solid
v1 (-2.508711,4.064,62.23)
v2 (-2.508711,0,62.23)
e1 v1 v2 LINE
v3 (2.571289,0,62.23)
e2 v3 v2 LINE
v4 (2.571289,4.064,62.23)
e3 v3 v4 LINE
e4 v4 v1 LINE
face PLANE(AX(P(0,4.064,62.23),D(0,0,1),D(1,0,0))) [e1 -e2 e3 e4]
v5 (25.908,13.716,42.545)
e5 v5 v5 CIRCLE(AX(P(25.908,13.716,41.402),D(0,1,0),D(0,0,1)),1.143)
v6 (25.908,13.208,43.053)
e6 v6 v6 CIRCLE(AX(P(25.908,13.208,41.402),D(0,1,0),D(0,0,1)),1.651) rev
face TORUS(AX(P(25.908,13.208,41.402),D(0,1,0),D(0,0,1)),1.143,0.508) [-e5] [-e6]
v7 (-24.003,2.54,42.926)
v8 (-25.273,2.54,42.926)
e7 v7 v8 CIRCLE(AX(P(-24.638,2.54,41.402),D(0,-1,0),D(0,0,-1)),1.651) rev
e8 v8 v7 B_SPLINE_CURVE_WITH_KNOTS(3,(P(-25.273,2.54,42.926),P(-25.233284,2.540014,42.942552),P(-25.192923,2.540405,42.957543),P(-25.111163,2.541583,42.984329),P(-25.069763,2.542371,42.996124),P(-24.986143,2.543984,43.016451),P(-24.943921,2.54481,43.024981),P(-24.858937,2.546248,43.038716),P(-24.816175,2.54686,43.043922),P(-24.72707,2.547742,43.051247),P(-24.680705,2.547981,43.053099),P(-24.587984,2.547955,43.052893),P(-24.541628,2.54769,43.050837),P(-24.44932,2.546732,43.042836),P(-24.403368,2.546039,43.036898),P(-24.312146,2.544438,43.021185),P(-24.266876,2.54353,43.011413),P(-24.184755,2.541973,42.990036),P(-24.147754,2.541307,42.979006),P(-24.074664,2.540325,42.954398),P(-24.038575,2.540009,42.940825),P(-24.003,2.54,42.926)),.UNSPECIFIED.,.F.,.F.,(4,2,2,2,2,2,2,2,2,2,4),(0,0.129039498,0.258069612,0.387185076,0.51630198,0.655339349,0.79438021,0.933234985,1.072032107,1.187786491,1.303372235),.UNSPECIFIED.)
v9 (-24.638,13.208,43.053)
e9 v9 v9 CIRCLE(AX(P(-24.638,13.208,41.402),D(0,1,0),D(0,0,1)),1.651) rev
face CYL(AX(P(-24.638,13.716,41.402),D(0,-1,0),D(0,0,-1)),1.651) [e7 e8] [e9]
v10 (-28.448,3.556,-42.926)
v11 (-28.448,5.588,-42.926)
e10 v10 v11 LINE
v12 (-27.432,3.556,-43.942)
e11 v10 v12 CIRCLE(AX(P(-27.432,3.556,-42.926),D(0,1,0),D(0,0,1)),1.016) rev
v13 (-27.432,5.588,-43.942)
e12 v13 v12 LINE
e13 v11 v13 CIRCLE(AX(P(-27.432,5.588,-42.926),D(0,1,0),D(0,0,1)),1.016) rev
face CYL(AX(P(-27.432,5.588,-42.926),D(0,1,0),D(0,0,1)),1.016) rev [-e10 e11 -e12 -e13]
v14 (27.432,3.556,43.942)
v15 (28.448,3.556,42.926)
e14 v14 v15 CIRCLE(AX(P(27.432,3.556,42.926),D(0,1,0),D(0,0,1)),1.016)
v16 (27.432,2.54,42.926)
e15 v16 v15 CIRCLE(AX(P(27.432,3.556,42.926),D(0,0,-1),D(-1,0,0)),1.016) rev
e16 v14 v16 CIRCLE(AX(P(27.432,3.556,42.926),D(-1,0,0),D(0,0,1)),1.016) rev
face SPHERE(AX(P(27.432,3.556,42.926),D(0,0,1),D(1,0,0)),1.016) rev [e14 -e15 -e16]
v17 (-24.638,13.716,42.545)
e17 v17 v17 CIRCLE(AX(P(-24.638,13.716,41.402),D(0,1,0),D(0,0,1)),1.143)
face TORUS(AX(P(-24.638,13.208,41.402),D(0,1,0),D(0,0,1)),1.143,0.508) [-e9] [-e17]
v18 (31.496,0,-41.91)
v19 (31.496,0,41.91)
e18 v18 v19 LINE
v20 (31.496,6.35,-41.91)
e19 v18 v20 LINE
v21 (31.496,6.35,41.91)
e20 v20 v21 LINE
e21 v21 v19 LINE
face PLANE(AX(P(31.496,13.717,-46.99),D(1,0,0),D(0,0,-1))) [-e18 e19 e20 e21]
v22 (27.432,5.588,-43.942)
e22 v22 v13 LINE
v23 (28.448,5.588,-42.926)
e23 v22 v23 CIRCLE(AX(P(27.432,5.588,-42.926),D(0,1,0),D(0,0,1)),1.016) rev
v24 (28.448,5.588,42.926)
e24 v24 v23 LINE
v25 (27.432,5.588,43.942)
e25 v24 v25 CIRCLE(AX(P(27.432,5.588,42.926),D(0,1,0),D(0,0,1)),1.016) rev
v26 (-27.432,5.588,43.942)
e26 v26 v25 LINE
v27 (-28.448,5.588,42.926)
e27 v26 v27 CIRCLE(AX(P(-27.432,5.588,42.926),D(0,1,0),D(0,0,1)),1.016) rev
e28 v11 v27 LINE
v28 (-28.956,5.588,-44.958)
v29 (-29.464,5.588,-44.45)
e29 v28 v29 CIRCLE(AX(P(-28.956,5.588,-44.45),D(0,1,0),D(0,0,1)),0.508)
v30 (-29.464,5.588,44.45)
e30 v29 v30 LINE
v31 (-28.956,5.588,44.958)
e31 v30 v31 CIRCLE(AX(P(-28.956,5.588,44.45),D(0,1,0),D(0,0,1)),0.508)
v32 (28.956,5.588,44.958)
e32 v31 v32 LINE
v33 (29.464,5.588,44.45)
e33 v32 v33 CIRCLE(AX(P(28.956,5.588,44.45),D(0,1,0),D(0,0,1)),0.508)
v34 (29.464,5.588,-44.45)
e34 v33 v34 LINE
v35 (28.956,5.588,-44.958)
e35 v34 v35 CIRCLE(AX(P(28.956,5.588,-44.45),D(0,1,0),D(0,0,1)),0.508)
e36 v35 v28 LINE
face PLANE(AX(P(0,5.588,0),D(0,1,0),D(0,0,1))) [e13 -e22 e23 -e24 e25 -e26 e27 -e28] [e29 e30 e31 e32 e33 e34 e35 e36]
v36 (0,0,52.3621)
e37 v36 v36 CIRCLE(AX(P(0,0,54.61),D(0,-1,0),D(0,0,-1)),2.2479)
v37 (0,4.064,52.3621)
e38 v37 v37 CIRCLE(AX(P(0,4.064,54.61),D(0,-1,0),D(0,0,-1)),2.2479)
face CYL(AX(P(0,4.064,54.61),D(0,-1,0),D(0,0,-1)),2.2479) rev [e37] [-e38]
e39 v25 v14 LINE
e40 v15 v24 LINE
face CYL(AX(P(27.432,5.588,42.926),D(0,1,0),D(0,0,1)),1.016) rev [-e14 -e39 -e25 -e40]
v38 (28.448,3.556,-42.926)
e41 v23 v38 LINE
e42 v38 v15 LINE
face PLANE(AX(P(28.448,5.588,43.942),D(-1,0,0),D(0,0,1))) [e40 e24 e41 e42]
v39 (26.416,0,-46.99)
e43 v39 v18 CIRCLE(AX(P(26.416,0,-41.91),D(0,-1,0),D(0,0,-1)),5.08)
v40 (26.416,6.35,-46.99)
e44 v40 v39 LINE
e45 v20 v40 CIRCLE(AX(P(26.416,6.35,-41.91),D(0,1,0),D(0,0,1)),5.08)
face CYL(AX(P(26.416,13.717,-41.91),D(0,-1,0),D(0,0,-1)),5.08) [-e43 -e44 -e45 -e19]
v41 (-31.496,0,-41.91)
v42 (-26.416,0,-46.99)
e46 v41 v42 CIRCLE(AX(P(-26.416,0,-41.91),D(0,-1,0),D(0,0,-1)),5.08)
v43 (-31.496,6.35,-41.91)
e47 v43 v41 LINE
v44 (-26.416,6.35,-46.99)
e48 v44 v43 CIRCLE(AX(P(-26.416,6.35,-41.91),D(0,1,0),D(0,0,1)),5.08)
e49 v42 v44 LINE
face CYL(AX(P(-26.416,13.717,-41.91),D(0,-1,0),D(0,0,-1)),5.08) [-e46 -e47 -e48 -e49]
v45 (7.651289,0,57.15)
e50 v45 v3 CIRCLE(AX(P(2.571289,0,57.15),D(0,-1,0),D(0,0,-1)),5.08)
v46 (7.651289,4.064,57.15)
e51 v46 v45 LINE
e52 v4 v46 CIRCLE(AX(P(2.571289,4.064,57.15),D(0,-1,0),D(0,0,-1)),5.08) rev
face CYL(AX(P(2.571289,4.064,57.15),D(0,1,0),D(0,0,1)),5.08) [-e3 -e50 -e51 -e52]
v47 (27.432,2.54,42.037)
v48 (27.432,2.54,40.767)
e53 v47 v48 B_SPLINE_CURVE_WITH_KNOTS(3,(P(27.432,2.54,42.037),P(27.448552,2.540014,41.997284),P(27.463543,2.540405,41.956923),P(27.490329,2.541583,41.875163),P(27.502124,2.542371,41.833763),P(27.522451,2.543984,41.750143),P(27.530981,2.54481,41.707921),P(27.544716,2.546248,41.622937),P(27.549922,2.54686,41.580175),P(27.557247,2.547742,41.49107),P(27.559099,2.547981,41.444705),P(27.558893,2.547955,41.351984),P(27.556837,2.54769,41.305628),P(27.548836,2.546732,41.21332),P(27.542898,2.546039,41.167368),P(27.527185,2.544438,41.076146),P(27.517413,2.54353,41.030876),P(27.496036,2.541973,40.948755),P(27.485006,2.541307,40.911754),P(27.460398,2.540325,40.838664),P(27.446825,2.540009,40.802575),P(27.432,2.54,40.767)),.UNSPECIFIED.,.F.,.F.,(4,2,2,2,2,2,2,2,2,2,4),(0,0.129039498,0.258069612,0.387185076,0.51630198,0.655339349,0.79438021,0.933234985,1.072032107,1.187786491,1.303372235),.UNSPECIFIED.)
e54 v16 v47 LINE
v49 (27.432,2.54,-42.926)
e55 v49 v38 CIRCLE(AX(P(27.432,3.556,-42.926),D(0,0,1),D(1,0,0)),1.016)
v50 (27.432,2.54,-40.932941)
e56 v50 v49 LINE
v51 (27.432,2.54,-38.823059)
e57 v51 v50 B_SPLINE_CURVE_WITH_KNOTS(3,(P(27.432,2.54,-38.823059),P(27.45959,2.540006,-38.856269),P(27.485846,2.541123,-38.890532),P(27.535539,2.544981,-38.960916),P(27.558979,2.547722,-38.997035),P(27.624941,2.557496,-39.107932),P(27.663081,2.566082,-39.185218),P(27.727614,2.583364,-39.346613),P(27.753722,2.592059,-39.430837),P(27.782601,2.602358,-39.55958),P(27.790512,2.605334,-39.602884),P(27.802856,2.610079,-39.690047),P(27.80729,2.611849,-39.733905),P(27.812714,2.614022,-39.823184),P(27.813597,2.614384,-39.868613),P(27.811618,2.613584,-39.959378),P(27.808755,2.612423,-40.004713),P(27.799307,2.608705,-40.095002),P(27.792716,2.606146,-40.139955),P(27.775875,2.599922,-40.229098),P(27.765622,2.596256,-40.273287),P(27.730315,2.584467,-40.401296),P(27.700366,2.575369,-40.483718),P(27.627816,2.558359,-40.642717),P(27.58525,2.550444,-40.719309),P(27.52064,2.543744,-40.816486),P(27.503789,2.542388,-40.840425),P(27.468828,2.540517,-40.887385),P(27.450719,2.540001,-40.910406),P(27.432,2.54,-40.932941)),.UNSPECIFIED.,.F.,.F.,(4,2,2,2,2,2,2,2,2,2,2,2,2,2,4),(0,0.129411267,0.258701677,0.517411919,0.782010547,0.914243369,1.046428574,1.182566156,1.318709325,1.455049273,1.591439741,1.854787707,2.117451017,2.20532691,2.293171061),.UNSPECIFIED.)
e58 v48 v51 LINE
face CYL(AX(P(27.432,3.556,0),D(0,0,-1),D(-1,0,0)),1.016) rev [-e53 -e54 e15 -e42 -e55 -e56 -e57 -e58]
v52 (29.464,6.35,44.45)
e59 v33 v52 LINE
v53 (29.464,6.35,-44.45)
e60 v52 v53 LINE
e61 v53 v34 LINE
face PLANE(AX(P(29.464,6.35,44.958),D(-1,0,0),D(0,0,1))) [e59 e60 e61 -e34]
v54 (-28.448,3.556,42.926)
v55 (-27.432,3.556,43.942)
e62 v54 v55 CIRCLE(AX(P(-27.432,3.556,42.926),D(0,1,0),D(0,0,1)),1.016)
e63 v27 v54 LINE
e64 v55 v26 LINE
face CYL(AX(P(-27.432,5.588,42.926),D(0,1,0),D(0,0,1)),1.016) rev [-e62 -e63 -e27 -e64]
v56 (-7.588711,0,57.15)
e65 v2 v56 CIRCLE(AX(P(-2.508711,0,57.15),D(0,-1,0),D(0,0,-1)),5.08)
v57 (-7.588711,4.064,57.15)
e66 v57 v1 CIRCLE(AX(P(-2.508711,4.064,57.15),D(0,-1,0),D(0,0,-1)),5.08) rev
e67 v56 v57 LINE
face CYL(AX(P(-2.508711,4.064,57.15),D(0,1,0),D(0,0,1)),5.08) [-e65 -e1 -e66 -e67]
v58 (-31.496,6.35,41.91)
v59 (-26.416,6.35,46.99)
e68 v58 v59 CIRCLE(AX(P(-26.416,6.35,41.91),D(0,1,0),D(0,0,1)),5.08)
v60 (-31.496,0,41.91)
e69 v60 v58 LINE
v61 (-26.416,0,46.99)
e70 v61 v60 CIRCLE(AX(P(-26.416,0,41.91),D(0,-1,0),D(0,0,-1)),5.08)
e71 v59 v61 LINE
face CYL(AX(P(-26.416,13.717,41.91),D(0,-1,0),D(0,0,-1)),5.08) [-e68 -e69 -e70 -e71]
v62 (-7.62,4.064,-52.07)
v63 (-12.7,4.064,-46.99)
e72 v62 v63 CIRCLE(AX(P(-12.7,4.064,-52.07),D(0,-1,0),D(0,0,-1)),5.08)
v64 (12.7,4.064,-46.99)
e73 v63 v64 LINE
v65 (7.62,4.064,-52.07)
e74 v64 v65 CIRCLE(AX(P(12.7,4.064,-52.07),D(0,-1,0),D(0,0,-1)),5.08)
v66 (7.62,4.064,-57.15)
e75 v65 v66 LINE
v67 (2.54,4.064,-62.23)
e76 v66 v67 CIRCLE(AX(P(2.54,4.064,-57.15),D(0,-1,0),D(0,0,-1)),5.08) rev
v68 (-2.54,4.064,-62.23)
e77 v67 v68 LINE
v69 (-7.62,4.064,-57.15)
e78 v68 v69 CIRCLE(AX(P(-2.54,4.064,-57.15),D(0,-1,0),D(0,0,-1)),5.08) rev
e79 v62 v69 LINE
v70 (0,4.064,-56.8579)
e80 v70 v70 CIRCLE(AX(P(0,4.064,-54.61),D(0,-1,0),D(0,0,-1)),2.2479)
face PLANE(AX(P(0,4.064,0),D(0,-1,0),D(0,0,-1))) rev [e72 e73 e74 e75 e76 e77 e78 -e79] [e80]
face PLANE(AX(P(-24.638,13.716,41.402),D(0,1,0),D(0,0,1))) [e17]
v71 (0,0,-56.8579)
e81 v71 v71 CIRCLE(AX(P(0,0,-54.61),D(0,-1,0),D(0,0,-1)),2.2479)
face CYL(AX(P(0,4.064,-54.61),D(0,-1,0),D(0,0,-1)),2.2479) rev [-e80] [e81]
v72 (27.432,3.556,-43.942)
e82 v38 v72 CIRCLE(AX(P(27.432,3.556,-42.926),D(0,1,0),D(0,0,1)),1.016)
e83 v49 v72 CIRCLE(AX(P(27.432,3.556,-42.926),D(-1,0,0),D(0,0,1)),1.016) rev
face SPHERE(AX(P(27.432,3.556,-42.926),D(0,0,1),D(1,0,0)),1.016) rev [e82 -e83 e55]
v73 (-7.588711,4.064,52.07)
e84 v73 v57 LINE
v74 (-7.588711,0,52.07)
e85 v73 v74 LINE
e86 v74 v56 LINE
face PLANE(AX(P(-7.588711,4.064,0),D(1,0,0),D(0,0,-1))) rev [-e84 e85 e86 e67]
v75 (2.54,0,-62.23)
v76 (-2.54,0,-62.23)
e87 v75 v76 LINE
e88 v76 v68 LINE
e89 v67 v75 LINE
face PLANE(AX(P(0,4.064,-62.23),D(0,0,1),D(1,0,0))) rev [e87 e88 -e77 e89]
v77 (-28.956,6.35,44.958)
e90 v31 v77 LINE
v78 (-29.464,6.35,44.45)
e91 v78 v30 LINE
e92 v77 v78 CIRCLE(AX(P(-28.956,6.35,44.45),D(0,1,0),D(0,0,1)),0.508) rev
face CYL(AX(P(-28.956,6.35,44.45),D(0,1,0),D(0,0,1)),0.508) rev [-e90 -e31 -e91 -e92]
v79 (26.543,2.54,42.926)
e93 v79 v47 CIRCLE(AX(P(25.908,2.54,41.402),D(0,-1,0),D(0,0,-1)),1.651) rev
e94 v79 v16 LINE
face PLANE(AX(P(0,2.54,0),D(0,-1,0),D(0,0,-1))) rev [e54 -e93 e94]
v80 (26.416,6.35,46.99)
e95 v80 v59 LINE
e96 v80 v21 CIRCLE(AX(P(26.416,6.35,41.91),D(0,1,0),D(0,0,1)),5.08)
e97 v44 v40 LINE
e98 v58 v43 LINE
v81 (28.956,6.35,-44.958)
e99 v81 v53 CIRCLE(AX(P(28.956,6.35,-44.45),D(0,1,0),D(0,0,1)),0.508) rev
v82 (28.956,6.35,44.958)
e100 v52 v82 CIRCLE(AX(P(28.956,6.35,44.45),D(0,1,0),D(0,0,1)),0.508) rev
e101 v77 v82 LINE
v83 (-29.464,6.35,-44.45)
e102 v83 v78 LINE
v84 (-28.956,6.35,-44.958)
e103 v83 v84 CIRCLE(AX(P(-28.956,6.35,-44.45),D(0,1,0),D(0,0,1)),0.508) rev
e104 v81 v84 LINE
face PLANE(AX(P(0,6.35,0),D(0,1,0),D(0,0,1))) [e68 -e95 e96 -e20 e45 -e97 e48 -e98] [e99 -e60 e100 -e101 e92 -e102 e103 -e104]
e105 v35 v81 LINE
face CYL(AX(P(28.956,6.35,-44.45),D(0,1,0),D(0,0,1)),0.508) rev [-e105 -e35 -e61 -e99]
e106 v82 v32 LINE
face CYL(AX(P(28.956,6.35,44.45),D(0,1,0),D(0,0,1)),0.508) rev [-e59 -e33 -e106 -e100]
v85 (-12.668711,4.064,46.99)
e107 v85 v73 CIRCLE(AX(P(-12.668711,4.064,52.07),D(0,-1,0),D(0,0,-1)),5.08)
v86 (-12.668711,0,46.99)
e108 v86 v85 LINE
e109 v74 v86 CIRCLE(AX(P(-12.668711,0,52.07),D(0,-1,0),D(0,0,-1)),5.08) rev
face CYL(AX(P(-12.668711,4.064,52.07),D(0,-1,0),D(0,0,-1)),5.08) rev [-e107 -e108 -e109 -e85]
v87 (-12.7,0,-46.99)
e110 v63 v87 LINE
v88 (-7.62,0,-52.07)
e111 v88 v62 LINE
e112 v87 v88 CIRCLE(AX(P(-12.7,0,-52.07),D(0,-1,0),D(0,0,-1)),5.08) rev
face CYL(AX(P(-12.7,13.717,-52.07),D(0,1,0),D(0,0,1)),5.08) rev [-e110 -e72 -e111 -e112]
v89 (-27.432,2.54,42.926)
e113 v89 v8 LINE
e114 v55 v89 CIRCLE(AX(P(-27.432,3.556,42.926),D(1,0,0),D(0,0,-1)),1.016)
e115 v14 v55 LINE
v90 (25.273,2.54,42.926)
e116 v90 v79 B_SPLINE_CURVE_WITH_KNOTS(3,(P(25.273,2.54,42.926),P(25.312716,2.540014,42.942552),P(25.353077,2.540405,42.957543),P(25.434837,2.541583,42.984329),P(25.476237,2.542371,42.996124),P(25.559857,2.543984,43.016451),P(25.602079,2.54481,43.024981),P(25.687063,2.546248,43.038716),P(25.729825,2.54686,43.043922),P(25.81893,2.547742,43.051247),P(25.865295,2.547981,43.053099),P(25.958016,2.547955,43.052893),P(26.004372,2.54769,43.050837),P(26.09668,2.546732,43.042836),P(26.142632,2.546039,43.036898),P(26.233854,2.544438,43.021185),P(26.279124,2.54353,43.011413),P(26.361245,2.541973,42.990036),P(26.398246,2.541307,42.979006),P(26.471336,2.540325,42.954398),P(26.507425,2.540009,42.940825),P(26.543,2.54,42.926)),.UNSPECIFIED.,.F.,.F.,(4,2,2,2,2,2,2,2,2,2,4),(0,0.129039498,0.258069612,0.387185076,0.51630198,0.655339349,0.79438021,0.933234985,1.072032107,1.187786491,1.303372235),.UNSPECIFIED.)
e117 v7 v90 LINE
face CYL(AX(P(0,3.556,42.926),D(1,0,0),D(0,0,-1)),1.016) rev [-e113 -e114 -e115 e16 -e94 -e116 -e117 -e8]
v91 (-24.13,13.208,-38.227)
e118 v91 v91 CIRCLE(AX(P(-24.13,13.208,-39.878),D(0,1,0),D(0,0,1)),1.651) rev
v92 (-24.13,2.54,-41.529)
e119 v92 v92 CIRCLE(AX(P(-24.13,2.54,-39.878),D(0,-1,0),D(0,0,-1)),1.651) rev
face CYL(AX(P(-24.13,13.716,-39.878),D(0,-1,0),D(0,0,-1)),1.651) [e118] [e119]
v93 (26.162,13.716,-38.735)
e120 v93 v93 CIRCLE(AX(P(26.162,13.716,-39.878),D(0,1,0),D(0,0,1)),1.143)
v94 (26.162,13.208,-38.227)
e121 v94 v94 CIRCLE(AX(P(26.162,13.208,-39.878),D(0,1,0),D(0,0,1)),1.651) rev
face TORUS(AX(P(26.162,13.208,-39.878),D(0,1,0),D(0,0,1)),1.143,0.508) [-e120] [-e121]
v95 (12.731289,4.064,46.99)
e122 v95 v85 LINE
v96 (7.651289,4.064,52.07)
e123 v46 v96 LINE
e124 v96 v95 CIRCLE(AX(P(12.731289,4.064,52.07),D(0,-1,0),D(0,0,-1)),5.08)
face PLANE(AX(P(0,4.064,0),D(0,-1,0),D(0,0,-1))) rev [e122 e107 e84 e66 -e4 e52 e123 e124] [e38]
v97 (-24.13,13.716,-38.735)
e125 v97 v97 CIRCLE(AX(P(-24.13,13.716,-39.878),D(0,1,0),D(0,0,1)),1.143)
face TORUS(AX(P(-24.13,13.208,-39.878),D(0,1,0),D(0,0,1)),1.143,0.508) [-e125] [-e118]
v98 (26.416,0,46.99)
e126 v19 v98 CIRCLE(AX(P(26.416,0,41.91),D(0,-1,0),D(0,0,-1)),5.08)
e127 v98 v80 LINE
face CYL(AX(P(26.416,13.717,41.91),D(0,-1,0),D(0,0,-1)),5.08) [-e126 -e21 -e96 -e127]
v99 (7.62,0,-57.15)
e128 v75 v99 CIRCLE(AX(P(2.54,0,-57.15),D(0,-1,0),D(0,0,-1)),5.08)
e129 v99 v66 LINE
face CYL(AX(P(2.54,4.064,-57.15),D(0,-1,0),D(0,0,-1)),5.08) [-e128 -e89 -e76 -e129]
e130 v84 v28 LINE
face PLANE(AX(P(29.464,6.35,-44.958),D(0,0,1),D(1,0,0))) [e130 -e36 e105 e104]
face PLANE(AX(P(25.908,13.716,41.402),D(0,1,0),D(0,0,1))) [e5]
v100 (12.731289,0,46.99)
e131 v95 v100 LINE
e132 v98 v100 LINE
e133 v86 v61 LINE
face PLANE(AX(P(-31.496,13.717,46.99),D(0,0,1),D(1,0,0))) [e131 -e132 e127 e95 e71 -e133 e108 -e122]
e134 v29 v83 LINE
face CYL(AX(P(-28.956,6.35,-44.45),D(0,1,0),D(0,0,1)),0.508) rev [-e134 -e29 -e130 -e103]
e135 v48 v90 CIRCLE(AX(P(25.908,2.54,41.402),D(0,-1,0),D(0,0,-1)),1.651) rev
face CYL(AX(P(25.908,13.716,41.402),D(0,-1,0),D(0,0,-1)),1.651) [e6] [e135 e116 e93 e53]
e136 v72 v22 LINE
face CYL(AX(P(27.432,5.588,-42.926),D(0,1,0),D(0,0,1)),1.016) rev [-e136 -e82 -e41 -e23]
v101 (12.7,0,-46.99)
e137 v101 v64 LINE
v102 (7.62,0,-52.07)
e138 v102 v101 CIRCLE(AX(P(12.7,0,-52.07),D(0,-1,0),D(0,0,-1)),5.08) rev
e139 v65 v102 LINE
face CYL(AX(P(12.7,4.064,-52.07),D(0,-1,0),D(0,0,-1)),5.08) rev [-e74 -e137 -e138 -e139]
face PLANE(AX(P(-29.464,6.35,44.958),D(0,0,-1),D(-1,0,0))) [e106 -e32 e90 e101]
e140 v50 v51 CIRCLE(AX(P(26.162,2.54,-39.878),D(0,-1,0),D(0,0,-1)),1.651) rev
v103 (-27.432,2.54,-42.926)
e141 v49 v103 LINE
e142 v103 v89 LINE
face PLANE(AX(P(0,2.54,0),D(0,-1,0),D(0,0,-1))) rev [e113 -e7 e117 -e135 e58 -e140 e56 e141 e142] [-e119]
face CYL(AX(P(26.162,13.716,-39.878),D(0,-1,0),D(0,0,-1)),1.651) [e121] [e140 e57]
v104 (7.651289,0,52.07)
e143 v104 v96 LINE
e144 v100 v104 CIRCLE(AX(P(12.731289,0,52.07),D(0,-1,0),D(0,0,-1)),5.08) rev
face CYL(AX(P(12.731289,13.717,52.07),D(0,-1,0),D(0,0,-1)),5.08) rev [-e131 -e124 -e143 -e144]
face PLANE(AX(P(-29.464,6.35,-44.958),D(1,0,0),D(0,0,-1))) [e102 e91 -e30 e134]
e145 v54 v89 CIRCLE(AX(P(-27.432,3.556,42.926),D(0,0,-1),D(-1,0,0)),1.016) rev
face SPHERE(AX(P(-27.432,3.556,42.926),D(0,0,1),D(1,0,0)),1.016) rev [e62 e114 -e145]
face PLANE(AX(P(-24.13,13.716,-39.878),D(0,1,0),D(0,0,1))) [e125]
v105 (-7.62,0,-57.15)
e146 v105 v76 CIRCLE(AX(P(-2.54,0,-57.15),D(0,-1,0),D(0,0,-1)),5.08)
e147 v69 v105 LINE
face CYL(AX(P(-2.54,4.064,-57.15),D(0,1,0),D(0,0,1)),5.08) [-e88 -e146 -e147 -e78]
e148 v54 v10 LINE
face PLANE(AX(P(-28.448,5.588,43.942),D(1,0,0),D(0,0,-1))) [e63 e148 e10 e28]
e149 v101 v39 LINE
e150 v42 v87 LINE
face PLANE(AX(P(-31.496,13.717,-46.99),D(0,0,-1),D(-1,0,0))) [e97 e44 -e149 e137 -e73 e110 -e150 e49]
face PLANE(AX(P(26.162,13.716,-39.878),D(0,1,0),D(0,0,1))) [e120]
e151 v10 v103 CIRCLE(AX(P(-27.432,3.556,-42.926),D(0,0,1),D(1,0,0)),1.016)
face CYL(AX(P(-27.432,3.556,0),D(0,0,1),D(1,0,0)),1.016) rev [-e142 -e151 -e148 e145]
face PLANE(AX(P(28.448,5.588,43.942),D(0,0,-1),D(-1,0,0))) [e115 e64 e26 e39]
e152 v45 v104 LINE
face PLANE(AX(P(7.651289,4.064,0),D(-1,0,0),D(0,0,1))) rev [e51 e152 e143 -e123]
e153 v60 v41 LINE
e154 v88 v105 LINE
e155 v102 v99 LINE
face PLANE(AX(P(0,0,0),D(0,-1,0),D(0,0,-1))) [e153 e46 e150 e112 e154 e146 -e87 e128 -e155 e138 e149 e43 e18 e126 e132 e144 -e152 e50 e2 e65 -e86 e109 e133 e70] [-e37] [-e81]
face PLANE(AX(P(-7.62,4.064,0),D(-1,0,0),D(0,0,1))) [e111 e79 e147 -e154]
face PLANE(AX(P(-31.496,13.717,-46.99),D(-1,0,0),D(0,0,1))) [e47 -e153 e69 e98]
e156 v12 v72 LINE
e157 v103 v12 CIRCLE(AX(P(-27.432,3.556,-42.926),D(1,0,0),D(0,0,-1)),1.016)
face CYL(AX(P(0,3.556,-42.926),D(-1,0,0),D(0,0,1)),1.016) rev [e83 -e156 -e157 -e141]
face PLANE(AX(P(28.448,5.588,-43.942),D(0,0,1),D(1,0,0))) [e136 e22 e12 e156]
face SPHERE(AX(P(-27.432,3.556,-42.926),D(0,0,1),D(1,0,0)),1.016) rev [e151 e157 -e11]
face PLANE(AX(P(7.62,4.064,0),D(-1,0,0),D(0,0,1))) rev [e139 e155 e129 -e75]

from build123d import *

# Parameters (mm, degrees)
SKETCH1_W           = 60.452
SKETCH1_H           = 91.44
BOSS_EXTRUDE4_DEPTH = 2.54
SKETCH7_W           = 65.532
SKETCH7_H           = 96.52
SKETCH7_W_2         = 60.452
SKETCH7_H_2         = 91.44
BOSS_EXTRUDE5_DEPTH = 6.35
SKETCH8_R           = 1.651
BOSS_EXTRUDE6_DEPTH = 11.176
SKETCH10_W          = 60.452
SKETCH10_H          = 91.44
SKETCH10_W_2        = 56.896
SKETCH10_H_2        = 87.884
BOSS_EXTRUDE7_DEPTH = 3.048
SKETCH13_W          = 60.452
SKETCH13_H          = 91.44
SKETCH13_W_2        = 58.928
SKETCH13_H_2        = 89.916
BOSS_EXTRUDE8_DEPTH = 0.762
CUT_EXTRUDE1_REACH  = 61.923
SKETCH14_W          = 65.532
SKETCH14_H          = 96.52
SKETCH14_W_2        = 62.992
SKETCH14_H_2        = 93.98
FILLET1_R           = 5.08
FILLET3_R           = 0.508
FILLET4_R           = 0.508
FILLET5_R           = 1.016
SKETCH16_W          = 15.24
SKETCH16_H          = 15.24
SKETCH16_R          = 2.2479
BOSS_EXTRUDE9_DEPTH = 4.064
FILLET8_R           = 5.08


with BuildPart() as part:
    # Sketch1 → Boss-Extrude4 (new body)
    with BuildSketch(Plane(origin=(0, 0, 0), x_dir=(1, 0, 0), z_dir=(0, 1, 0))):
        Rectangle(SKETCH1_W, SKETCH1_H)
    extrude(amount=BOSS_EXTRUDE4_DEPTH)

    # Sketch7 → Boss-Extrude5 (add)
    with BuildSketch(Plane.XZ):
        Rectangle(SKETCH7_W, SKETCH7_H)
        Rectangle(SKETCH7_W_2, SKETCH7_H_2, mode=Mode.SUBTRACT)
    extrude(amount=-BOSS_EXTRUDE5_DEPTH)

    # Sketch8 → Boss-Extrude6 (add)
    with BuildSketch(Plane(origin=(0, 2.54, 0), x_dir=(1, 0, 0), z_dir=(0, 1, 0))):
        with Locations(Location((-24.13, 39.878, 0), (0, 0, 90))):
            Circle(SKETCH8_R)
        with Locations(Location((26.162, 39.878, 0), (0, 0, 90))):
            Circle(SKETCH8_R)
        with Locations(Location((-24.638, -41.402, 0), (0, 0, 90))):
            Circle(SKETCH8_R)
        with Locations(Location((25.908, -41.402, 0), (0, 0, 90))):
            Circle(SKETCH8_R)
    extrude(amount=BOSS_EXTRUDE6_DEPTH)

    # Sketch10 → Boss-Extrude7 (add)
    with BuildSketch(Plane(origin=(0, 2.54, 0), x_dir=(1, 0, 0), z_dir=(0, 1, 0))):
        Rectangle(SKETCH10_W, SKETCH10_H)
        Rectangle(SKETCH10_W_2, SKETCH10_H_2, mode=Mode.SUBTRACT)
    extrude(amount=BOSS_EXTRUDE7_DEPTH)

    # Sketch13 → Boss-Extrude8 (add)
    with BuildSketch(Plane(origin=(0, 5.588, 0), x_dir=(1, 0, 0), z_dir=(0, 1, 0))):
        Rectangle(SKETCH13_W, SKETCH13_H)
        Rectangle(SKETCH13_W_2, SKETCH13_H_2, mode=Mode.SUBTRACT)
    extrude(amount=BOSS_EXTRUDE8_DEPTH)

    # Sketch14 → Cut-Extrude1 (cut, up to next)
    with BuildSketch(Plane.XZ, mode=Mode.PRIVATE) as cut_extrude1_sk1:
        Rectangle(SKETCH14_W, SKETCH14_H)
        Rectangle(SKETCH14_W_2, SKETCH14_H_2, mode=Mode.SUBTRACT)
    cut_extrude1_tool1 = extrude(cut_extrude1_sk1.sketch, amount=-CUT_EXTRUDE1_REACH, mode=Mode.PRIVATE) & part.part
    add(cut_extrude1_tool1.solids().sort_by_distance((0, 0, -47.093357))[0], mode=Mode.SUBTRACT)

    # Fillet1
    fillet1_edges = [part.edges().sort_by_distance(p)[0] for p in [
        (-31.496, 3.175, -46.99),
        (-31.496, 3.175, 46.99),
        (31.496, 3.175, 46.99),
        (31.496, 3.175, -46.99),
    ]]
    fillet(fillet1_edges, radius=FILLET1_R)

    # Fillet3
    fillet3_edges = [part.edges().sort_by_distance(p)[0] for p in [
        (-24.13, 13.716, -38.227),
        (-24.638, 13.716, 43.053),
        (26.162, 13.716, -38.227),
        (25.908, 13.716, 43.053),
    ]]
    fillet(fillet3_edges, radius=FILLET3_R)

    # Fillet4
    fillet4_edges = [part.edges().sort_by_distance(p)[0] for p in [
        (29.464, 5.969, 44.958),
        (29.464, 5.969, -44.958),
        (-29.464, 5.969, -44.958),
        (-29.464, 5.969, 44.958),
    ]]
    fillet(fillet4_edges, radius=FILLET4_R)

    # Fillet5
    # the kernel refuses this fillet: 1.016 mm, written as the material it adds along each edge
    with BuildSketch(Plane(origin=(-27.432, 3.556, 42.926), x_dir=(-1, 0, 0), z_dir=(0, 0, 1))) as fillet5_piece_1_section:
        Polygon((0, 0), (FILLET5_R, 0), (FILLET5_R, FILLET5_R), (0, FILLET5_R), align=None)
    fillet5_piece_1 = extrude(amount=FILLET5_R, mode=Mode.PRIVATE)
    fillet5_piece_1 = fillet5_piece_1 - Plane(origin=(-27.432, 3.556, 42.926), x_dir=(0.7071067811865475, 0.7071067811865475, 0), z_dir=(0, 0, 1)) * Sphere(FILLET5_R, mode=Mode.PRIVATE)
    add(fillet5_piece_1)
    with BuildSketch(Plane(origin=(27.432, 3.556, 42.926), x_dir=(0, 0, 1), z_dir=(1, 0, 0))) as fillet5_piece_2_section:
        Polygon((0, 0), (FILLET5_R, 0), (FILLET5_R, FILLET5_R), (0, FILLET5_R), align=None)
    fillet5_piece_2 = extrude(amount=FILLET5_R, mode=Mode.PRIVATE)
    fillet5_piece_2 = fillet5_piece_2 - Plane(origin=(27.432, 3.556, 42.926), x_dir=(0, 0.7071067811865475, -0.7071067811865475), z_dir=(1, 0, 0)) * Sphere(FILLET5_R, mode=Mode.PRIVATE)
    add(fillet5_piece_2)
    with BuildSketch(Plane(origin=(27.432, 3.556, -42.926), x_dir=(0, 0, -1), z_dir=(1, 0, 0))) as fillet5_piece_3_section:
        Polygon((0, 0), (FILLET5_R, 0), (FILLET5_R, -FILLET5_R), (0, -FILLET5_R), align=None)
    fillet5_piece_3 = extrude(amount=FILLET5_R, mode=Mode.PRIVATE)
    fillet5_piece_3 = fillet5_piece_3 - Plane(origin=(27.432, 3.556, -42.926), x_dir=(0, 0.7071067811865475, 0.7071067811865475), z_dir=(1, 0, 0)) * Sphere(FILLET5_R, mode=Mode.PRIVATE)
    add(fillet5_piece_3)
    with BuildSketch(Plane(origin=(-27.432, 3.556, -42.926), x_dir=(-1, 0, 0), z_dir=(0, 0, -1))) as fillet5_piece_4_section:
        Polygon((0, 0), (FILLET5_R, 0), (FILLET5_R, -FILLET5_R), (0, -FILLET5_R), align=None)
    fillet5_piece_4 = extrude(amount=FILLET5_R, mode=Mode.PRIVATE)
    fillet5_piece_4 = fillet5_piece_4 - Plane(origin=(-27.432, 3.556, -42.926), x_dir=(0.7071067811865475, 0.7071067811865475, 0), z_dir=(0, 0, -1)) * Sphere(FILLET5_R, mode=Mode.PRIVATE)
    add(fillet5_piece_4)
    with BuildSketch(Plane(origin=(-27.432, 2.54, 43.942), x_dir=(0, 1, 0), z_dir=(1, 0, 0)), Plane(origin=(27.432, 2.54, -43.942), x_dir=(0, 1, 0), z_dir=(-1, 0, 0))) as fillet5_piece_5:
        with BuildLine():
            CenterArc((FILLET5_R, -FILLET5_R), FILLET5_R, 90, 90)
            Line((0, -FILLET5_R), (0, 0))
            Line((0, 0), (FILLET5_R, 0))
        make_face()
    extrude(amount=54.864)
    with BuildSketch(Plane(origin=(28.448, 2.54, 42.926), x_dir=(0, 1, 0), z_dir=(0, 0, -1)), Plane(origin=(-28.448, 2.54, -42.926), x_dir=(0, 1, 0), z_dir=(0, 0, 1))) as fillet5_piece_6:
        with BuildLine():
            CenterArc((FILLET5_R, -FILLET5_R), FILLET5_R, 90, 90)
            Line((0, -FILLET5_R), (0, 0))
            Line((0, 0), (FILLET5_R, 0))
        make_face()
    extrude(amount=85.852)
    with BuildSketch(Plane(origin=(28.448, 3.556, 43.942), x_dir=(0, 0, -1), z_dir=(0, 1, 0)), Plane(origin=(-28.448, 3.556, 43.942), x_dir=(1, 0, 0), z_dir=(0, 1, 0))) as fillet5_piece_7:
        with BuildLine():
            CenterArc((FILLET5_R, FILLET5_R), FILLET5_R, 180, 90)
            Line((0, FILLET5_R), (0, 0))
            Line((0, 0), (FILLET5_R, 0))
        make_face()
    extrude(amount=2.032)
    with BuildSketch(Plane(origin=(28.448, 3.556, -43.942), x_dir=(0, 0, 1), z_dir=(0, 1, 0)), Plane(origin=(-28.448, 3.556, -43.942), x_dir=(1, 0, 0), z_dir=(0, 1, 0))) as fillet5_piece_8:
        with BuildLine():
            CenterArc((FILLET5_R, -FILLET5_R), FILLET5_R, 90, 90)
            Line((0, -FILLET5_R), (0, 0))
            Line((0, 0), (FILLET5_R, 0))
        make_face()
    extrude(amount=2.032)

    # Sketch16 → Boss-Extrude9 (add)
    # profile 1 of 2: a face of its own
    with BuildSketch(Plane.XZ):
        with Locations((0.031289089, 54.61)):
            Rectangle(SKETCH16_W, SKETCH16_H)
        with Locations(Location((0, 54.61, 0), (0, 0, 270))):
            Circle(SKETCH16_R, mode=Mode.SUBTRACT)
    # profile 2 of 2: a face of its own
    with BuildSketch(Plane.XZ):
        Polygon((7.62, -46.99), (0, -46.99), (-7.62, -46.99), (-7.62, -62.23), (7.62, -62.23), align=None)
        with Locations(Location((0, -54.61, 0), (0, 0, 270))):
            Circle(SKETCH16_R, mode=Mode.SUBTRACT)
    extrude(amount=-BOSS_EXTRUDE9_DEPTH)

    # Fillet8
    fillet8_edges = [part.edges().sort_by_distance(p)[0] for p in [
        (7.651289089, 2.032, 62.23),
        (7.651289089, 2.032, 46.99),
        (-7.588710911, 2.032, 46.99),
        (-7.588710911, 2.032, 62.23),
        (7.62, 2.032, -46.99),
        (7.62, 2.032, -62.23),
        (-7.62, 2.032, -62.23),
        (-7.62, 2.032, -46.99),
    ]]
    fillet(fillet8_edges, radius=FILLET8_R)


solid = part.part
